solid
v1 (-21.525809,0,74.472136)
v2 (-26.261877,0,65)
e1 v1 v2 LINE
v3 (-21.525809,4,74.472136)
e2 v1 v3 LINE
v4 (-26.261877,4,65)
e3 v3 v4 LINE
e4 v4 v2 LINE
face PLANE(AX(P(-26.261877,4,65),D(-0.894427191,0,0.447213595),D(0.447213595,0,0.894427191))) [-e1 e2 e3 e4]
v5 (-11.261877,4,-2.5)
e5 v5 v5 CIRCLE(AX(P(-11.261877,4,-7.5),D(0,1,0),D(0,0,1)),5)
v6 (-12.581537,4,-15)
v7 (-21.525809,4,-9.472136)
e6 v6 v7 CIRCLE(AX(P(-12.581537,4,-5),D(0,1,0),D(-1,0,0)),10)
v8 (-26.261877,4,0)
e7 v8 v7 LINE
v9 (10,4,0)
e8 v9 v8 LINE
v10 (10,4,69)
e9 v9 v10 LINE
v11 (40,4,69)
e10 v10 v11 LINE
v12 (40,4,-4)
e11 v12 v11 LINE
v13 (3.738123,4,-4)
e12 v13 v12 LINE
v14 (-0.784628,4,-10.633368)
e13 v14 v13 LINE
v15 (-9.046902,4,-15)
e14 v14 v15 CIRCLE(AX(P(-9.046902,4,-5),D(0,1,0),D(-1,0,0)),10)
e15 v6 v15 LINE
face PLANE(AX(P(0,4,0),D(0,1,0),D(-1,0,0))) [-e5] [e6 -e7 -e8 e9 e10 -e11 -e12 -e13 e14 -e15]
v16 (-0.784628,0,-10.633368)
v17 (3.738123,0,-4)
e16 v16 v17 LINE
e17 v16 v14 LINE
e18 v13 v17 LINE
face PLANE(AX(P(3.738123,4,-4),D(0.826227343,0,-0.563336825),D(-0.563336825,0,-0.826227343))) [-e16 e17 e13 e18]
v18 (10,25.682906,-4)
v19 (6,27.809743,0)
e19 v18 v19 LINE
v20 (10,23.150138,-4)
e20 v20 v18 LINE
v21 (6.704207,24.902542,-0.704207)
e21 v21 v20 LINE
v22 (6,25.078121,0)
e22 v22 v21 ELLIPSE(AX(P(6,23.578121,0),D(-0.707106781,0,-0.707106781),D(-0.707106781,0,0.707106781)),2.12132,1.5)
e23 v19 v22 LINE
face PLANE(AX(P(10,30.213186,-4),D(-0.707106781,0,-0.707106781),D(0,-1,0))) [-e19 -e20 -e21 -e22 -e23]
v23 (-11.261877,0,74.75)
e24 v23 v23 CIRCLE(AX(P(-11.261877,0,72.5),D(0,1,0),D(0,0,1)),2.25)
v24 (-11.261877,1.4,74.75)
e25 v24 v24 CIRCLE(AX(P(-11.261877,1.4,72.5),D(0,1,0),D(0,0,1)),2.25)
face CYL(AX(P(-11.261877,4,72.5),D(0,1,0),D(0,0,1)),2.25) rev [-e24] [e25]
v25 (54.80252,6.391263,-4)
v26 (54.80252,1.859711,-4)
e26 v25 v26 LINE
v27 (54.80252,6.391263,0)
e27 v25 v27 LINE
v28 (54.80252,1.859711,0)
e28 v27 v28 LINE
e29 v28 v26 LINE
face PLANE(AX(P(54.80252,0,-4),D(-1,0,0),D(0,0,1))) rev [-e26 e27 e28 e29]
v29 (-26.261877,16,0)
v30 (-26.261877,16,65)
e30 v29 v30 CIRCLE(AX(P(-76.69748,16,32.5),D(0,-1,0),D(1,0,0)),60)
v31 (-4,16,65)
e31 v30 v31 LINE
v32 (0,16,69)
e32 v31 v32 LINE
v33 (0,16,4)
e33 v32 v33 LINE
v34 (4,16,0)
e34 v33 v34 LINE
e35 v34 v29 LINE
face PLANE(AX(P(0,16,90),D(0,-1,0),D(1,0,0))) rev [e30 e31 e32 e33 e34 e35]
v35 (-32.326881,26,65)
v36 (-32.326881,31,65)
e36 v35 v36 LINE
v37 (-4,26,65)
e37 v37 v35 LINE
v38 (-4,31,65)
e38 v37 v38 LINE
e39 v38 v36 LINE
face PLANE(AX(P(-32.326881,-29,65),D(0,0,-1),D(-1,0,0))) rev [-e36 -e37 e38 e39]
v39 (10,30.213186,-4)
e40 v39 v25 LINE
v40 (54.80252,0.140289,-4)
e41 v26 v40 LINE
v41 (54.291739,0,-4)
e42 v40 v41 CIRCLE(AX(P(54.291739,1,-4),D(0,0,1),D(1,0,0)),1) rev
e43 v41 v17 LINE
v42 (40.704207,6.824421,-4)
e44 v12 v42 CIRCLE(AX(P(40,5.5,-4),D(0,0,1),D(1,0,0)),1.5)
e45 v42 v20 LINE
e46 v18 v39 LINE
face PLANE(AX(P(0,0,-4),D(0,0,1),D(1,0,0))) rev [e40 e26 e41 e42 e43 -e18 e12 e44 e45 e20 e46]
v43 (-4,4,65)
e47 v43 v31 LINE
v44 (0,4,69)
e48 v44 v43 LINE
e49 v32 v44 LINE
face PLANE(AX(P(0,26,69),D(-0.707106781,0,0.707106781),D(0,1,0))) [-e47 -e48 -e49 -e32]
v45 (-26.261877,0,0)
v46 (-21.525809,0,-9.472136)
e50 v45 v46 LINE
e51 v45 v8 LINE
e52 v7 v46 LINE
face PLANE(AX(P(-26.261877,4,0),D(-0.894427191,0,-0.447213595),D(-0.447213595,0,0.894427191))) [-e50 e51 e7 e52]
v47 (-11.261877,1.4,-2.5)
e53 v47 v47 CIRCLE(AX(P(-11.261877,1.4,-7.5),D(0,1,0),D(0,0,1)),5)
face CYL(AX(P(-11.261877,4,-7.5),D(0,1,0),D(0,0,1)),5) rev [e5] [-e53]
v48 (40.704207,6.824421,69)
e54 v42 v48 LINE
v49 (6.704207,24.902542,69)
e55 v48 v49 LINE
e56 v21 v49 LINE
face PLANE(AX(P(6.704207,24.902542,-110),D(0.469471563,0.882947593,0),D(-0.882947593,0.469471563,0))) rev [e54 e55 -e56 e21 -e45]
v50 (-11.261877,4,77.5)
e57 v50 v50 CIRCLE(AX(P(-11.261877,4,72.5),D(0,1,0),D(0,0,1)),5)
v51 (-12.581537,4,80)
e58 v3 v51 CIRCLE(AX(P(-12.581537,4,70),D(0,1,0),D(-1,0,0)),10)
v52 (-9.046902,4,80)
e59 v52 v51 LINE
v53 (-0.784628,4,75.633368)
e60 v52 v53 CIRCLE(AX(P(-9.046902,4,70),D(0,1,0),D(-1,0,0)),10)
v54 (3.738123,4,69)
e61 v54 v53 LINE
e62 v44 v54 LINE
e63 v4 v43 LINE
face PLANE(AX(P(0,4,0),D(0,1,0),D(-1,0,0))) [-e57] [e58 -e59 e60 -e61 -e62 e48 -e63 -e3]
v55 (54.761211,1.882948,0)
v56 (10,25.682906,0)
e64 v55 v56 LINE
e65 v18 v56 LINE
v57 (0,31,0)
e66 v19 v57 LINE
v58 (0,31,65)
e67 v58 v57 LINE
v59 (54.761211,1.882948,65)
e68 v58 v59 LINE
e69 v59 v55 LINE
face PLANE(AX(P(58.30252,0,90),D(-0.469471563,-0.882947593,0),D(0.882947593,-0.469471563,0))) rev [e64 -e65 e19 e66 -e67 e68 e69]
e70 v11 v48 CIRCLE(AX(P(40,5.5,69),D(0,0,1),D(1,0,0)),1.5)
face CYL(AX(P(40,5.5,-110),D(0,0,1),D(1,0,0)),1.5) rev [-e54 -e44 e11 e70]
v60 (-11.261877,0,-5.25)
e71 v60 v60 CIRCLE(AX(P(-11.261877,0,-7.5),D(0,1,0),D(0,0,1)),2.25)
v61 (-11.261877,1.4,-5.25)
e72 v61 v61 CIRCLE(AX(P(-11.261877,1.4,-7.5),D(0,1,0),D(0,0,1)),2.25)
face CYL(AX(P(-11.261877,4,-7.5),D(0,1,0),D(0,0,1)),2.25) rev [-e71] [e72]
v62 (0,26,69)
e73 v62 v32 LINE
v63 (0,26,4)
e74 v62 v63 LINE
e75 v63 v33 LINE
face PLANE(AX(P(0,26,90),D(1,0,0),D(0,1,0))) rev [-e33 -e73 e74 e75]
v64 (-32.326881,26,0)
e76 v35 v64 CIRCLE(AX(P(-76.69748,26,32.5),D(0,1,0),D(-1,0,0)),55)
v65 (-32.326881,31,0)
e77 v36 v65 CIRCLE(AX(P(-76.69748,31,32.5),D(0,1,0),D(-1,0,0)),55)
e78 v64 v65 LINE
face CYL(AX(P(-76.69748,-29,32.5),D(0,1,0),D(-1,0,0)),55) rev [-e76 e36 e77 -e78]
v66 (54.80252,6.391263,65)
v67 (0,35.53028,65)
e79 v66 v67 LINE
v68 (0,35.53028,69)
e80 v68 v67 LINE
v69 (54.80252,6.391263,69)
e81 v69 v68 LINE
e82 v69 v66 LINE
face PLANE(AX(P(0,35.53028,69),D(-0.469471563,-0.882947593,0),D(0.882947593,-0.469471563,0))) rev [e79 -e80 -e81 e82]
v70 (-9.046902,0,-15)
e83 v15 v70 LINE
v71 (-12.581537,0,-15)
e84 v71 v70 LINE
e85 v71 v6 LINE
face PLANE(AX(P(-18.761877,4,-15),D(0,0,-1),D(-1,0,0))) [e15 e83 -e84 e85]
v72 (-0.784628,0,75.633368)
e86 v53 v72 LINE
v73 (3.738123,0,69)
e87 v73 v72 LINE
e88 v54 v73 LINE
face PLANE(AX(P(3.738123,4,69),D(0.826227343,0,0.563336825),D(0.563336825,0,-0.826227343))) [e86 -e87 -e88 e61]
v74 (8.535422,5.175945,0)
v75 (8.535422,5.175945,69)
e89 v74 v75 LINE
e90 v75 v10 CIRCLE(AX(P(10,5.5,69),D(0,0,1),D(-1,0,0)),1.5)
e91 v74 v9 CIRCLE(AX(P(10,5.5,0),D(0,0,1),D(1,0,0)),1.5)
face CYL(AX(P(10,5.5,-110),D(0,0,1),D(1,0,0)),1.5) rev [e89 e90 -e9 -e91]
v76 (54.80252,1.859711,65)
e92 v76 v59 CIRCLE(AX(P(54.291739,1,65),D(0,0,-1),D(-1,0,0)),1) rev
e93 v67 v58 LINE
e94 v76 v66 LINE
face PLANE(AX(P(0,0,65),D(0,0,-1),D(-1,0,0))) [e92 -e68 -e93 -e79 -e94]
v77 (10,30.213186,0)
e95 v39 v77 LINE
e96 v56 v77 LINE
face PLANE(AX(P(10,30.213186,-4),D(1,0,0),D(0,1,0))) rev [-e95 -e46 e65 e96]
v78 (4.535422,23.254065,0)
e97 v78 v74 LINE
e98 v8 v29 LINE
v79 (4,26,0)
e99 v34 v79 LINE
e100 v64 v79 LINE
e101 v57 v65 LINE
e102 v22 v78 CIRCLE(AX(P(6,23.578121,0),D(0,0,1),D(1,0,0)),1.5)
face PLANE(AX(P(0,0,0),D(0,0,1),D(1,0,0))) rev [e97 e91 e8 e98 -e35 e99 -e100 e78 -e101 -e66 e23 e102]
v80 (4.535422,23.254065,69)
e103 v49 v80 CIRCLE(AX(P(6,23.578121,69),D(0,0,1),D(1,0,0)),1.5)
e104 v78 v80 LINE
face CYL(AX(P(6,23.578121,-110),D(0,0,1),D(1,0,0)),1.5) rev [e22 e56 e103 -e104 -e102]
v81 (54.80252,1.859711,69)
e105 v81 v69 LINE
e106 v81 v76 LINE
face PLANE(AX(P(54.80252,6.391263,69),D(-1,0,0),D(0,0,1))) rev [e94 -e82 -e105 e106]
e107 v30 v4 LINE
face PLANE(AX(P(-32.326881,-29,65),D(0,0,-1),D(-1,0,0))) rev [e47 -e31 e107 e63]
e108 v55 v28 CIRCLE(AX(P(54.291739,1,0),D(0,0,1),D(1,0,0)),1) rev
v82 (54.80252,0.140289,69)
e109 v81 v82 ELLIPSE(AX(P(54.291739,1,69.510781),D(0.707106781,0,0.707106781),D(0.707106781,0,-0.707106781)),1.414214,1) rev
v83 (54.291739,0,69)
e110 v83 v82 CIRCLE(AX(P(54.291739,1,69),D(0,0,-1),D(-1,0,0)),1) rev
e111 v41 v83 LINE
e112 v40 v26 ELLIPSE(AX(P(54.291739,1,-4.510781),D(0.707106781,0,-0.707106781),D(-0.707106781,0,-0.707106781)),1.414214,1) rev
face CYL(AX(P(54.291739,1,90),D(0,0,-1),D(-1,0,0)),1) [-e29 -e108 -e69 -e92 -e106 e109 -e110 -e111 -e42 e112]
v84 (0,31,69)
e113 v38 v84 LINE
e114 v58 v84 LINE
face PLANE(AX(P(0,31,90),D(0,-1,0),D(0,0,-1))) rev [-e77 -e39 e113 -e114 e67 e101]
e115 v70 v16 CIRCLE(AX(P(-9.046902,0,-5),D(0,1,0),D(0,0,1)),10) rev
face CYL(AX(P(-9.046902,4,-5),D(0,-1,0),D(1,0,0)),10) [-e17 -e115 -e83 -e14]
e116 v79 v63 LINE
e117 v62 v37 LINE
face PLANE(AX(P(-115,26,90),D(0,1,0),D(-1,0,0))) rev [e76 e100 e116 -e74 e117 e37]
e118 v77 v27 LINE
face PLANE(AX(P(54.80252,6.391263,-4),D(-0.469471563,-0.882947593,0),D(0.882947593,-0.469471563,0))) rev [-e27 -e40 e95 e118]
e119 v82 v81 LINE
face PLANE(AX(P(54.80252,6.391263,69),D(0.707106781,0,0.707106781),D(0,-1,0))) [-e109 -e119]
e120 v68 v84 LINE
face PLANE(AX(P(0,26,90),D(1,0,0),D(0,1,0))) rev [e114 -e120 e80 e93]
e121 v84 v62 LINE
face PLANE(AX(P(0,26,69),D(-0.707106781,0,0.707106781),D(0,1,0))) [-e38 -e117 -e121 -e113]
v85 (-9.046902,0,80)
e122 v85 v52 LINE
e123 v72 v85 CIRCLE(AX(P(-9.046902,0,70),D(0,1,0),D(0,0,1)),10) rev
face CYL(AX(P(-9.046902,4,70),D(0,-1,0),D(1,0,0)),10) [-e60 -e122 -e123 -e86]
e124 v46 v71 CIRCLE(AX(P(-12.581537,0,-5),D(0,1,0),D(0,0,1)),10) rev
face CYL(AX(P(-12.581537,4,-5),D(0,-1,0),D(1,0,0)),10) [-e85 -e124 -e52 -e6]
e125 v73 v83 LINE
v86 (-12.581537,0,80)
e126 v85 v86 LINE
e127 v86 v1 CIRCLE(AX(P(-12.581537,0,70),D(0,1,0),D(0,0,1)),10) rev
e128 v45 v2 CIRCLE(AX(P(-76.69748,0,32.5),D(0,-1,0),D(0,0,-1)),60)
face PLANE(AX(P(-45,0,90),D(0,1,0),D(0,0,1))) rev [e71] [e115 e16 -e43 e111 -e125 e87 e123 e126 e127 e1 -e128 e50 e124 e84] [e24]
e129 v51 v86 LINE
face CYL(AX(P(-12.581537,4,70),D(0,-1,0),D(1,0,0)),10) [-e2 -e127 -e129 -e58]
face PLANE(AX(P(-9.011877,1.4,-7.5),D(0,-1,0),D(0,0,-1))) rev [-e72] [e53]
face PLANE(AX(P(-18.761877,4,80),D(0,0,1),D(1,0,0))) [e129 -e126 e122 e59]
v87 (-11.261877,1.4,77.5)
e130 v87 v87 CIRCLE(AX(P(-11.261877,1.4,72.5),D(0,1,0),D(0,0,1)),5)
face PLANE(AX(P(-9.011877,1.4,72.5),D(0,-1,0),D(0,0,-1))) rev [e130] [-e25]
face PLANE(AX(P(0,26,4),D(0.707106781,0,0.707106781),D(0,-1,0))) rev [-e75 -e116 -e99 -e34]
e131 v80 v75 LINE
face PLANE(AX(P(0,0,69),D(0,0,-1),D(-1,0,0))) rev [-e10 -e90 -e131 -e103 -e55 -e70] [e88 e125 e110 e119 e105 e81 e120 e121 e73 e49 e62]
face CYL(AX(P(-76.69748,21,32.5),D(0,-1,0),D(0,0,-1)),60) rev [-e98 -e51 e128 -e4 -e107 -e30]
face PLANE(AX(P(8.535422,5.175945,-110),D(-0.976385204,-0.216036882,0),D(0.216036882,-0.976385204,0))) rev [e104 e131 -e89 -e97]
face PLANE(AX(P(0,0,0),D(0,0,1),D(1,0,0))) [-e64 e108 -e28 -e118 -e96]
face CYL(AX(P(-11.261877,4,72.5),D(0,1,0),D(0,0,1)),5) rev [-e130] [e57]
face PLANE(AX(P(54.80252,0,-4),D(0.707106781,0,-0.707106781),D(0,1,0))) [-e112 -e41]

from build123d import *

# Parameters (mm, degrees)
ESTRUSIONE_ESTRUSIONE1_DEPTH                         = 90
TAGLIO_ESTRUSIONE1_DEPTH                             = 60
SCHIZZO3_R                                           = 60
TAGLIO_ESTRUSIONE2_DEPTH                             = 21
ESTRUSIONE_ESTRUSIONE2_DEPTH                         = 4
FORO_LAMATO_PER_VITE_M4_A_TESTA_CILINDRI_D           = 4.5
FORO_LAMATO_PER_VITE_M4_A_TESTA_CILINDRI_DEPTH       = 8
FORO_LAMATO_PER_VITE_M4_A_TESTA_CILINDRI_CBORE_D     = 10
FORO_LAMATO_PER_VITE_M4_A_TESTA_CILINDRI_CBORE_DEPTH = 2.6
FORO_LAMATO_PER_VITE_M4_A_TESTA_CILINDRI_TIP         = 1.351936393
RACCORDO3_R                                          = 10
ESTRUSIONE_ESTRUSIONE3_DEPTH                         = 4
ESTRUSIONE_ESTRUSIONE4_DEPTH                         = 4
TAGLIO_ESTRUSIONE3_DEPTH                             = 179
SMUSSO1_SIZE                                         = 4
RACCORDO4_START                                      = -5
RACCORDO4_DEPTH                                      = 75
RACCORDO4_2_DEPTH                                    = 65
SMUSSO2_SIZE                                         = 4
SMUSSO3_SIZE                                         = 4


with BuildPart() as part:
    # Schizzo1 → Estrusione-Estrusione1 (new body)
    with BuildSketch(Plane.XY):
        Polygon((-115, 26), (0, 26), (0, 16), (-45, 16), (-45, 0), (58.302520426, 0), (0, 31), (-115, 31), align=None)
    extrude(amount=ESTRUSIONE_ESTRUSIONE1_DEPTH)

    # Schizzo2 → Taglio-Estrusione1 (cut)
    with BuildSketch(Plane(origin=(0, 31, 0), x_dir=(1, 0, 0), z_dir=(0, 1, 0))):
        with BuildLine():
            Line((-32.326881201, -65), (58.302520426, -65))
            Line((58.302520426, -65), (58.302520426, -90))
            Line((58.302520426, -90), (-115, -90))
            Line((-115, -90), (-115, 0))
            Line((-115, 0), (-32.326881201, 0))
            ThreePointArc((-32.326881201, 0), (-21.697479574, -32.5), (-32.326881201, -65))
        make_face()
    extrude(amount=-TAGLIO_ESTRUSIONE1_DEPTH, mode=Mode.SUBTRACT)

    # Schizzo3 → Taglio-Estrusione2 (cut)
    with BuildSketch(Plane.XZ):
        with Locations((-76.697479574, 32.5)):
            Circle(SCHIZZO3_R)
    extrude(amount=-TAGLIO_ESTRUSIONE2_DEPTH, mode=Mode.SUBTRACT)

    # Schizzo4 → Estrusione-Estrusione2 (add)
    with BuildSketch(Plane.XZ):
        Polygon((-26.26187707, 65), (-18.76187707, 80), (-3.76187707, 80), (3.73812293, 69), (3.73812293, 65), align=None)
        Polygon((-26.26187707, 0), (-18.76187707, -15), (-3.76187707, -15), (3.73812293, -4), (3.73812293, 0), align=None)
    extrude(amount=-ESTRUSIONE_ESTRUSIONE2_DEPTH)

    # Foro lamato per Vite M4 a testa cilindrica piana-1
    with Locations(Plane(origin=(-11.26187707, 4, 72.5), x_dir=(0, 0, 1), z_dir=(0, 1, 0))):
        with Locations((0, 0), (-80, 0)):
            CounterBoreHole(FORO_LAMATO_PER_VITE_M4_A_TESTA_CILINDRI_D / 2, FORO_LAMATO_PER_VITE_M4_A_TESTA_CILINDRI_CBORE_D / 2, FORO_LAMATO_PER_VITE_M4_A_TESTA_CILINDRI_CBORE_DEPTH, depth=FORO_LAMATO_PER_VITE_M4_A_TESTA_CILINDRI_DEPTH)
            with Locations((0, 0, -(FORO_LAMATO_PER_VITE_M4_A_TESTA_CILINDRI_DEPTH + FORO_LAMATO_PER_VITE_M4_A_TESTA_CILINDRI_TIP / 2))):  # 118° drill point
                Cone(0, FORO_LAMATO_PER_VITE_M4_A_TESTA_CILINDRI_D / 2, FORO_LAMATO_PER_VITE_M4_A_TESTA_CILINDRI_TIP, mode=Mode.SUBTRACT)

    # Raccordo3
    raccordo3_edges = [part.edges().sort_by_distance(p)[0] for p in [
        (-18.76187707, 2, 80),
        (-3.76187707, 2, 80),
        (-3.76187707, 2, -15),
        (-18.76187707, 2, -15),
    ]]
    fillet(raccordo3_edges, radius=RACCORDO3_R)

    # Schizzo9 → Estrusione-Estrusione3 (add)
    with BuildSketch(Plane.XY.offset(65)):
        Polygon((3.73812293, 0), (3.73812293, 4), (0, 4), (0, 35.530280203), (54.802520426, 6.391263214), (54.802520426, 0), align=None)
    extrude(amount=ESTRUSIONE_ESTRUSIONE3_DEPTH)

    # Schizzo10 → Estrusione-Estrusione4 (add)
    with BuildSketch(Plane(origin=(0, 0, 0), x_dir=(-1, 0, 0), z_dir=(0, 0, -1))):
        Polygon((-54.802520426, 0), (-54.802520426, 6.391263214), (-10, 30.213185886), (-10, 4), (-3.73812293, 4), (-3.73812293, 0), align=None)
    extrude(amount=ESTRUSIONE_ESTRUSIONE4_DEPTH)

    # Schizzo6 → Taglio-Estrusione3 (cut)
    with BuildSketch(Plane.XY.offset(69)):
        with BuildLine():
            Line((6.704207344, 24.902542066), (40.704207344, 6.824421389))
            ThreePointArc((40.704207344, 6.824421389), (41.455443589, 5.137117157), (40, 4))
            Line((40, 4), (10, 4))
            ThreePointArc((10, 4), (9.06087354, 4.330366941), (8.535422195, 5.175944678))
            Line((8.535422195, 5.175944678), (4.535422195, 23.254065354))
            ThreePointArc((4.535422195, 23.254065354), (5.092305295, 24.772310914), (6.704207344, 24.902542066))
        make_face()
    extrude(amount=-TAGLIO_ESTRUSIONE3_DEPTH, mode=Mode.SUBTRACT)

    # Smusso1
    # the kernel refuses this chamfer: 4 mm, written as the material it adds along each edge
    with BuildSketch(Plane(origin=(0, 15.713268048, 65), x_dir=(-1, 0, 0), z_dir=(0, 1, 0))) as smusso1_piece_1_section:
        Polygon((SMUSSO1_SIZE, 0), (0, SMUSSO1_SIZE), (0, 0), align=None)
    smusso1_piece_1 = extrude(amount=25.573463904, mode=Mode.PRIVATE)
    smusso1_piece_1 = split(smusso1_piece_1, bisect_by=Plane(origin=(0, 16, 65), z_dir=(0, -1, 0)), keep=Keep.TOP, mode=Mode.PRIVATE)
    add(smusso1_piece_1)
    with BuildSketch(Plane(origin=(0, 26, 65), x_dir=(-1, 0, 0), z_dir=(0, 1, 0))) as smusso1_piece_2:
        Polygon((SMUSSO1_SIZE, 0), (0, SMUSSO1_SIZE), (0, 0), align=None)
    extrude(amount=5)
    with BuildSketch(Plane(origin=(0, 4, 65), x_dir=(0, 0, 1), z_dir=(0, 1, 0))) as smusso1_piece_3:
        Polygon((SMUSSO1_SIZE, 0), (0, -SMUSSO1_SIZE), (0, 0), align=None)
    extrude(amount=12)
    with BuildSketch(Plane(origin=(0, -6.286731952, 65), x_dir=(0, 0, 1), z_dir=(0, 1, 0))) as smusso1_piece_4_section:
        Polygon((SMUSSO1_SIZE, 0), (0, -SMUSSO1_SIZE), (0, 0), align=None)
    smusso1_piece_4 = extrude(amount=32.573463904, mode=Mode.PRIVATE)
    smusso1_piece_4 = split(smusso1_piece_4, bisect_by=Plane(origin=(0, 26, 65), z_dir=(0, 1, 0)), keep=Keep.TOP, mode=Mode.PRIVATE)
    add(smusso1_piece_4)
    # the kernel refuses this chamfer: 4 mm, written as the material it takes off along each edge
    with BuildSketch(Plane(origin=(0, 26, 0), x_dir=(1, 0, 0), z_dir=(0, -1, 0))) as smusso1_2_piece_1:
        Polygon((SMUSSO1_SIZE, 0), (0, SMUSSO1_SIZE), (0, 0), align=None)
    extrude(amount=10, mode=Mode.SUBTRACT)

    # Raccordo4: read off the stored shape, not the designer's step
    # Raccordo4 outline → Raccordo4 (cut)
    with BuildSketch(Plane.XY.offset(RACCORDO4_START)):
        with BuildLine():
            Line((54.291739492, 0), (58.302520426, 0))
            Line((58.302520426, 0), (54.802520426, 1.860983011))
            Line((54.802520426, 1.860983011), (54.802520426, 1.859710904))
            ThreePointArc((54.802520426, 1.859710904), (55.25602962, 0.735151839), (54.291739492, 0))
        make_face()
    extrude(amount=RACCORDO4_DEPTH, mode=Mode.SUBTRACT)

    # Raccordo4 2 outline → Raccordo4 2 (cut)
    with BuildSketch(Plane.XY):
        with BuildLine():
            ThreePointArc((54.761211055, 1.882947593), (54.782003426, 1.871574022), (54.802520426, 1.859710904))
            Line((54.802520426, 1.859710904), (54.802520426, 1.860983011))
            Line((54.802520426, 1.860983011), (54.761211055, 1.882947593))
        make_face()
    extrude(amount=RACCORDO4_2_DEPTH, mode=Mode.SUBTRACT)

    # Smusso2
    # the kernel refuses this chamfer: 4 mm, written as the material it adds along each edge
    with BuildSketch(Plane(origin=(54.802520426, 12.146442856, 65), x_dir=(0, 0, 1), z_dir=(0, -1, 0))) as smusso2_piece_1_section:
        Polygon((SMUSSO2_SIZE, 0), (0, -SMUSSO2_SIZE), (0, 0), align=None)
    smusso2_piece_1 = extrude(amount=22.292885711, mode=Mode.PRIVATE)
    smusso2_piece_1 = smusso2_piece_1 & Plane(origin=(54.291739491, 1, 65), x_dir=(0.5107809344553311, 0.8597109031511343, 0), z_dir=(0, 0, -1)) * Cylinder(1, 61, mode=Mode.PRIVATE)
    add(smusso2_piece_1)
    # the kernel refuses this chamfer: 4 mm, written as the material it adds along each edge
    with BuildSketch(Plane(origin=(54.802520426, -10.146442855, 0), x_dir=(0, 0, -1), z_dir=(0, 1, 0))) as smusso2_2_piece_1_section:
        Polygon((SMUSSO2_SIZE, 0), (0, -SMUSSO2_SIZE), (0, 0), align=None)
    smusso2_2_piece_1 = extrude(amount=22.292885711, mode=Mode.PRIVATE)
    smusso2_2_piece_1 = smusso2_2_piece_1 & Plane(origin=(54.291739491, 1, 0), x_dir=(0.5107809344553311, 0.8597109031511343, 0), z_dir=(0, 0, -1)) * Cylinder(1, 61, mode=Mode.PRIVATE)
    add(smusso2_2_piece_1)

    # Smusso3
    smusso3_edges = [part.edges().sort_by_distance(p)[0] for p in [
        (10, 24.416521855, 0),
    ]]
    chamfer(smusso3_edges, length=SMUSSO3_SIZE - 0.0001)  # a hair under: the kernel refuses the full size


solid = part.part
